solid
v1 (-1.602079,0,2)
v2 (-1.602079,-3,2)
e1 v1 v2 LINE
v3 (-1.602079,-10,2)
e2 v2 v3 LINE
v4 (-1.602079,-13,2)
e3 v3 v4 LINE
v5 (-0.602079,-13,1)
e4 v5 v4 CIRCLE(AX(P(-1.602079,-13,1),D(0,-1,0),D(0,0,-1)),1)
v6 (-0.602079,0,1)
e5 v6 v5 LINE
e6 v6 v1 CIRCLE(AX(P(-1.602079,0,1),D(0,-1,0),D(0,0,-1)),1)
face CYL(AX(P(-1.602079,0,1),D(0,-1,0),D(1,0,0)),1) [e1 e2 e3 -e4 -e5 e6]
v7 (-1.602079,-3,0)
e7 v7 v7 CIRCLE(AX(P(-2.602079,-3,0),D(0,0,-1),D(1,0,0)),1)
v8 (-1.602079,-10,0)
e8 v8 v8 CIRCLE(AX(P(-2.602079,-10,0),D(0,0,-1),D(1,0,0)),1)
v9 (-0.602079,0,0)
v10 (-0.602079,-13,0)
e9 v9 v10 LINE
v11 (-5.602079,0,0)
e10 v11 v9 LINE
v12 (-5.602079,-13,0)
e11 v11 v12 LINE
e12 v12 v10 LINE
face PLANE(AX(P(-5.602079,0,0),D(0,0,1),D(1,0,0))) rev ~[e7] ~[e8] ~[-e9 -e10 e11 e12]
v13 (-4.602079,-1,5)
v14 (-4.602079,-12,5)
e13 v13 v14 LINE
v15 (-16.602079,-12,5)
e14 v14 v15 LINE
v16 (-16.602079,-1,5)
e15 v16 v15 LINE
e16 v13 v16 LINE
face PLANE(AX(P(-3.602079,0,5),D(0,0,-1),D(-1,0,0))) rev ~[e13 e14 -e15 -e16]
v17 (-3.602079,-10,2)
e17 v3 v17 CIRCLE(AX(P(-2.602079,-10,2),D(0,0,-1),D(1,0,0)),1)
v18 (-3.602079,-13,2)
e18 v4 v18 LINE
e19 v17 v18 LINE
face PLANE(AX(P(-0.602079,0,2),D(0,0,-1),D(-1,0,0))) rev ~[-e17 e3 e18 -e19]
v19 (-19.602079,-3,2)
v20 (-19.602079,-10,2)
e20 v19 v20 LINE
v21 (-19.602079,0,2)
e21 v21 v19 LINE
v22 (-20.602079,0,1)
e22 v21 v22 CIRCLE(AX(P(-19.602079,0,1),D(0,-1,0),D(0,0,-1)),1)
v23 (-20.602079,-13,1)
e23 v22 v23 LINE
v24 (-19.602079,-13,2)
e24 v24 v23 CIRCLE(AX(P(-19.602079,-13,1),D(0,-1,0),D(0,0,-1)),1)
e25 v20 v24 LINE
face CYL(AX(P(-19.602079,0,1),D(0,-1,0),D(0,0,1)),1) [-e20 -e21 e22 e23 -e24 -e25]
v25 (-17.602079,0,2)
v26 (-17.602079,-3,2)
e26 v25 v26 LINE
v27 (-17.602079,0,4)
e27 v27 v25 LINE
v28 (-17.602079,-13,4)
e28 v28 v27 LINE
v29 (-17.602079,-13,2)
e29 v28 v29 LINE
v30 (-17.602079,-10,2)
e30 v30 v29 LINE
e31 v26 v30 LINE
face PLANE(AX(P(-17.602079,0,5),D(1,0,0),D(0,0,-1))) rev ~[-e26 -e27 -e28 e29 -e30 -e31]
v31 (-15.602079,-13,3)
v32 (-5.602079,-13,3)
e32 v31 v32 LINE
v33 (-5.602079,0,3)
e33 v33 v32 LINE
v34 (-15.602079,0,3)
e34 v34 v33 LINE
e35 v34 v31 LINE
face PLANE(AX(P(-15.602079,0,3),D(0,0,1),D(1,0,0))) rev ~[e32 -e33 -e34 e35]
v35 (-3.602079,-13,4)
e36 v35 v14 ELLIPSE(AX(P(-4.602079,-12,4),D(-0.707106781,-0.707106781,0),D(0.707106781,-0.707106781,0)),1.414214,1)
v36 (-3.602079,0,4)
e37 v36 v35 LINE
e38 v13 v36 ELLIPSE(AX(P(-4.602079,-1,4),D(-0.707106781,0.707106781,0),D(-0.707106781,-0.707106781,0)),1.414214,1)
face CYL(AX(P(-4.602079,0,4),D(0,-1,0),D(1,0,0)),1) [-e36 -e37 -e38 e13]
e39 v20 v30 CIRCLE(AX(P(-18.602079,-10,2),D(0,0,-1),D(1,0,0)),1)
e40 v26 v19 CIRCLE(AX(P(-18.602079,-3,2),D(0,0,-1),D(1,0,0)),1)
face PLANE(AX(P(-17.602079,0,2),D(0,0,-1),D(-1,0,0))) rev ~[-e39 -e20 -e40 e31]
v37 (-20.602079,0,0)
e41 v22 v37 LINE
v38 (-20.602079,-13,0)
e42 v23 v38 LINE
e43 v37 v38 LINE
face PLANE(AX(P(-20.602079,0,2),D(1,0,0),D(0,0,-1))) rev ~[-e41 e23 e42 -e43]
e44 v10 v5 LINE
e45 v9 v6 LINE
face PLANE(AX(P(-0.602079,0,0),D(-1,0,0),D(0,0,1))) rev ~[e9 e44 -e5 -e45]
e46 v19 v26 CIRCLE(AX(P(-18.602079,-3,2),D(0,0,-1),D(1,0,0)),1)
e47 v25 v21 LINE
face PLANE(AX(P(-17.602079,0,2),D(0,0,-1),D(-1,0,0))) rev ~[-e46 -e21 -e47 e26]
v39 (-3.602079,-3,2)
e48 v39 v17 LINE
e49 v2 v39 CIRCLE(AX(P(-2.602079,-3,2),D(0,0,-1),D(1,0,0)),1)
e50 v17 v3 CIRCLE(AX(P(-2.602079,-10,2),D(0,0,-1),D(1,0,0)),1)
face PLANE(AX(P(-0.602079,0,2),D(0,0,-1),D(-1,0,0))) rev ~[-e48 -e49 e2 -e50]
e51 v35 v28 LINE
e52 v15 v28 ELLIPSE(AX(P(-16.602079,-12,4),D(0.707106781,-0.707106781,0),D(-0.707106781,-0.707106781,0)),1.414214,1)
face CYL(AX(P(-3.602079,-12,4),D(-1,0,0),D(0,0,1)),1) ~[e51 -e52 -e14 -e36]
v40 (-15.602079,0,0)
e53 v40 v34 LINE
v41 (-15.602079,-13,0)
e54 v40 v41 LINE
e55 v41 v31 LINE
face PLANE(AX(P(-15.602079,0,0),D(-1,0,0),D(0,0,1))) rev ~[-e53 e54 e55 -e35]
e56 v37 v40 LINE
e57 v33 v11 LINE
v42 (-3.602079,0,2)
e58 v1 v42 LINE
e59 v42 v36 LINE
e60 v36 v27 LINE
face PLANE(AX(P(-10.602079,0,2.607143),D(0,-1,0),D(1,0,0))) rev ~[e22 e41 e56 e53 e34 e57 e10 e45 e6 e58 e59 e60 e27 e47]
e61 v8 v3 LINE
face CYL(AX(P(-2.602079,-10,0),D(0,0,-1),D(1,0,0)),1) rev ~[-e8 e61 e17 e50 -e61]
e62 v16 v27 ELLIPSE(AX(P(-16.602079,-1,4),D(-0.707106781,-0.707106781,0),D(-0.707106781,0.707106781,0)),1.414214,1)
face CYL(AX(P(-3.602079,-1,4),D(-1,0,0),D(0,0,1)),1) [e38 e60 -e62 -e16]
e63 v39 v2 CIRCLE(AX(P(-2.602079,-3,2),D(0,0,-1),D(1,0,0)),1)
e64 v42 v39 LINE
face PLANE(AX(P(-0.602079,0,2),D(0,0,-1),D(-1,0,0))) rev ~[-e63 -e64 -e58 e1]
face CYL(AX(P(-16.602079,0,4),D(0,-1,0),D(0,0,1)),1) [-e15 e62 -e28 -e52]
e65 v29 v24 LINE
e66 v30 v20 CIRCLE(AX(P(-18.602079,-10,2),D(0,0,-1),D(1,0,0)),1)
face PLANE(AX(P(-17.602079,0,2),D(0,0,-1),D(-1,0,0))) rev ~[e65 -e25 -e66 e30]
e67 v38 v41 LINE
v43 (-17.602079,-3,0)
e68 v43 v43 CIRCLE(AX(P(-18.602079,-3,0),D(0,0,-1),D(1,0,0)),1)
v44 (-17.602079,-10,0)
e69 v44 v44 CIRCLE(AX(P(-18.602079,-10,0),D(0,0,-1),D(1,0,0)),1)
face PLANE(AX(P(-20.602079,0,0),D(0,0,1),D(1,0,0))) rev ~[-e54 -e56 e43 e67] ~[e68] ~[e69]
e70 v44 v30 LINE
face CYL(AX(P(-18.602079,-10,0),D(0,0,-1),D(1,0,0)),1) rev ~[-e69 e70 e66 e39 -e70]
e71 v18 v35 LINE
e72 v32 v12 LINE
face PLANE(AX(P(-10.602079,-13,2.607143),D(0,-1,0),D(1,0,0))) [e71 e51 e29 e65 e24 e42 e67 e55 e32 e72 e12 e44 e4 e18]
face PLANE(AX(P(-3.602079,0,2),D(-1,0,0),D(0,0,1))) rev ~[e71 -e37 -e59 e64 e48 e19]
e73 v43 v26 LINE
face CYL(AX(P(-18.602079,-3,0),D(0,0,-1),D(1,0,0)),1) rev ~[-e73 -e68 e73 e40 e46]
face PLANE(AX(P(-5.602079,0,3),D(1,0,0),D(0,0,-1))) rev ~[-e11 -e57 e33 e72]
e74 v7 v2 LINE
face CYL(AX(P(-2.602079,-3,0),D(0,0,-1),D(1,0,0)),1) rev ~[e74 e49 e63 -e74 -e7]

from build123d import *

# Parameters (mm, degrees)
F1_DEPTH = 13
F2_R     = 1
F3_R     = 1
F4_DEPTH = 25
F5_R     = 1
F6_DEPTH = 25


with BuildPart() as f1:
    # F0 (on Front) → F1 (new body)
    with BuildSketch(Plane.XZ):
        Polygon((-20.602078989, 0), (-18.61380395, 0), (-15.602078989, 0), (-15.602078989, 3), (-5.602078989, 3), (-5.602078989, 0), (-0.602078989, 0), (-0.602078989, 2), (-3.602078989, 2), (-3.602078989, 5), (-17.602078989, 5), (-17.602078989, 2), (-20.602078989, 2), align=None)
    extrude(amount=F1_DEPTH)

    # F2
    f2_edges = [f1.edges().sort_by_distance(p)[0] for p in [
        (-10.602079, 0, 5),
        (-3.602079, -6.5, 5),
        (-17.602079, -6.5, 5),
        (-10.602079, -13, 5),
        (-0.602079, -6.5, 2),
        (-20.602079, -6.5, 2),
    ]]
    fillet(f2_edges, radius=F2_R)

    # F3 (on face) → F4 (cut)
    with BuildSketch(Plane(origin=(0, 0, 0), x_dir=(1, 0, 0), z_dir=(0, 0, -1))):
        with Locations((-18.602078989, 10)):
            Circle(F3_R)
        with Locations((-18.602078989, 3)):
            Circle(F3_R)
    extrude(amount=-F4_DEPTH, mode=Mode.SUBTRACT)

    # F5 (on face) → F6 (cut)
    with BuildSketch(Plane(origin=(0, 0, 0), x_dir=(1, 0, 0), z_dir=(0, 0, -1))):
        with Locations((-2.602078989, 10)):
            Circle(F5_R)
        with Locations((-2.602078989, 3)):
            Circle(F5_R)
    extrude(amount=-F6_DEPTH, mode=Mode.SUBTRACT)


solid = f1.part
